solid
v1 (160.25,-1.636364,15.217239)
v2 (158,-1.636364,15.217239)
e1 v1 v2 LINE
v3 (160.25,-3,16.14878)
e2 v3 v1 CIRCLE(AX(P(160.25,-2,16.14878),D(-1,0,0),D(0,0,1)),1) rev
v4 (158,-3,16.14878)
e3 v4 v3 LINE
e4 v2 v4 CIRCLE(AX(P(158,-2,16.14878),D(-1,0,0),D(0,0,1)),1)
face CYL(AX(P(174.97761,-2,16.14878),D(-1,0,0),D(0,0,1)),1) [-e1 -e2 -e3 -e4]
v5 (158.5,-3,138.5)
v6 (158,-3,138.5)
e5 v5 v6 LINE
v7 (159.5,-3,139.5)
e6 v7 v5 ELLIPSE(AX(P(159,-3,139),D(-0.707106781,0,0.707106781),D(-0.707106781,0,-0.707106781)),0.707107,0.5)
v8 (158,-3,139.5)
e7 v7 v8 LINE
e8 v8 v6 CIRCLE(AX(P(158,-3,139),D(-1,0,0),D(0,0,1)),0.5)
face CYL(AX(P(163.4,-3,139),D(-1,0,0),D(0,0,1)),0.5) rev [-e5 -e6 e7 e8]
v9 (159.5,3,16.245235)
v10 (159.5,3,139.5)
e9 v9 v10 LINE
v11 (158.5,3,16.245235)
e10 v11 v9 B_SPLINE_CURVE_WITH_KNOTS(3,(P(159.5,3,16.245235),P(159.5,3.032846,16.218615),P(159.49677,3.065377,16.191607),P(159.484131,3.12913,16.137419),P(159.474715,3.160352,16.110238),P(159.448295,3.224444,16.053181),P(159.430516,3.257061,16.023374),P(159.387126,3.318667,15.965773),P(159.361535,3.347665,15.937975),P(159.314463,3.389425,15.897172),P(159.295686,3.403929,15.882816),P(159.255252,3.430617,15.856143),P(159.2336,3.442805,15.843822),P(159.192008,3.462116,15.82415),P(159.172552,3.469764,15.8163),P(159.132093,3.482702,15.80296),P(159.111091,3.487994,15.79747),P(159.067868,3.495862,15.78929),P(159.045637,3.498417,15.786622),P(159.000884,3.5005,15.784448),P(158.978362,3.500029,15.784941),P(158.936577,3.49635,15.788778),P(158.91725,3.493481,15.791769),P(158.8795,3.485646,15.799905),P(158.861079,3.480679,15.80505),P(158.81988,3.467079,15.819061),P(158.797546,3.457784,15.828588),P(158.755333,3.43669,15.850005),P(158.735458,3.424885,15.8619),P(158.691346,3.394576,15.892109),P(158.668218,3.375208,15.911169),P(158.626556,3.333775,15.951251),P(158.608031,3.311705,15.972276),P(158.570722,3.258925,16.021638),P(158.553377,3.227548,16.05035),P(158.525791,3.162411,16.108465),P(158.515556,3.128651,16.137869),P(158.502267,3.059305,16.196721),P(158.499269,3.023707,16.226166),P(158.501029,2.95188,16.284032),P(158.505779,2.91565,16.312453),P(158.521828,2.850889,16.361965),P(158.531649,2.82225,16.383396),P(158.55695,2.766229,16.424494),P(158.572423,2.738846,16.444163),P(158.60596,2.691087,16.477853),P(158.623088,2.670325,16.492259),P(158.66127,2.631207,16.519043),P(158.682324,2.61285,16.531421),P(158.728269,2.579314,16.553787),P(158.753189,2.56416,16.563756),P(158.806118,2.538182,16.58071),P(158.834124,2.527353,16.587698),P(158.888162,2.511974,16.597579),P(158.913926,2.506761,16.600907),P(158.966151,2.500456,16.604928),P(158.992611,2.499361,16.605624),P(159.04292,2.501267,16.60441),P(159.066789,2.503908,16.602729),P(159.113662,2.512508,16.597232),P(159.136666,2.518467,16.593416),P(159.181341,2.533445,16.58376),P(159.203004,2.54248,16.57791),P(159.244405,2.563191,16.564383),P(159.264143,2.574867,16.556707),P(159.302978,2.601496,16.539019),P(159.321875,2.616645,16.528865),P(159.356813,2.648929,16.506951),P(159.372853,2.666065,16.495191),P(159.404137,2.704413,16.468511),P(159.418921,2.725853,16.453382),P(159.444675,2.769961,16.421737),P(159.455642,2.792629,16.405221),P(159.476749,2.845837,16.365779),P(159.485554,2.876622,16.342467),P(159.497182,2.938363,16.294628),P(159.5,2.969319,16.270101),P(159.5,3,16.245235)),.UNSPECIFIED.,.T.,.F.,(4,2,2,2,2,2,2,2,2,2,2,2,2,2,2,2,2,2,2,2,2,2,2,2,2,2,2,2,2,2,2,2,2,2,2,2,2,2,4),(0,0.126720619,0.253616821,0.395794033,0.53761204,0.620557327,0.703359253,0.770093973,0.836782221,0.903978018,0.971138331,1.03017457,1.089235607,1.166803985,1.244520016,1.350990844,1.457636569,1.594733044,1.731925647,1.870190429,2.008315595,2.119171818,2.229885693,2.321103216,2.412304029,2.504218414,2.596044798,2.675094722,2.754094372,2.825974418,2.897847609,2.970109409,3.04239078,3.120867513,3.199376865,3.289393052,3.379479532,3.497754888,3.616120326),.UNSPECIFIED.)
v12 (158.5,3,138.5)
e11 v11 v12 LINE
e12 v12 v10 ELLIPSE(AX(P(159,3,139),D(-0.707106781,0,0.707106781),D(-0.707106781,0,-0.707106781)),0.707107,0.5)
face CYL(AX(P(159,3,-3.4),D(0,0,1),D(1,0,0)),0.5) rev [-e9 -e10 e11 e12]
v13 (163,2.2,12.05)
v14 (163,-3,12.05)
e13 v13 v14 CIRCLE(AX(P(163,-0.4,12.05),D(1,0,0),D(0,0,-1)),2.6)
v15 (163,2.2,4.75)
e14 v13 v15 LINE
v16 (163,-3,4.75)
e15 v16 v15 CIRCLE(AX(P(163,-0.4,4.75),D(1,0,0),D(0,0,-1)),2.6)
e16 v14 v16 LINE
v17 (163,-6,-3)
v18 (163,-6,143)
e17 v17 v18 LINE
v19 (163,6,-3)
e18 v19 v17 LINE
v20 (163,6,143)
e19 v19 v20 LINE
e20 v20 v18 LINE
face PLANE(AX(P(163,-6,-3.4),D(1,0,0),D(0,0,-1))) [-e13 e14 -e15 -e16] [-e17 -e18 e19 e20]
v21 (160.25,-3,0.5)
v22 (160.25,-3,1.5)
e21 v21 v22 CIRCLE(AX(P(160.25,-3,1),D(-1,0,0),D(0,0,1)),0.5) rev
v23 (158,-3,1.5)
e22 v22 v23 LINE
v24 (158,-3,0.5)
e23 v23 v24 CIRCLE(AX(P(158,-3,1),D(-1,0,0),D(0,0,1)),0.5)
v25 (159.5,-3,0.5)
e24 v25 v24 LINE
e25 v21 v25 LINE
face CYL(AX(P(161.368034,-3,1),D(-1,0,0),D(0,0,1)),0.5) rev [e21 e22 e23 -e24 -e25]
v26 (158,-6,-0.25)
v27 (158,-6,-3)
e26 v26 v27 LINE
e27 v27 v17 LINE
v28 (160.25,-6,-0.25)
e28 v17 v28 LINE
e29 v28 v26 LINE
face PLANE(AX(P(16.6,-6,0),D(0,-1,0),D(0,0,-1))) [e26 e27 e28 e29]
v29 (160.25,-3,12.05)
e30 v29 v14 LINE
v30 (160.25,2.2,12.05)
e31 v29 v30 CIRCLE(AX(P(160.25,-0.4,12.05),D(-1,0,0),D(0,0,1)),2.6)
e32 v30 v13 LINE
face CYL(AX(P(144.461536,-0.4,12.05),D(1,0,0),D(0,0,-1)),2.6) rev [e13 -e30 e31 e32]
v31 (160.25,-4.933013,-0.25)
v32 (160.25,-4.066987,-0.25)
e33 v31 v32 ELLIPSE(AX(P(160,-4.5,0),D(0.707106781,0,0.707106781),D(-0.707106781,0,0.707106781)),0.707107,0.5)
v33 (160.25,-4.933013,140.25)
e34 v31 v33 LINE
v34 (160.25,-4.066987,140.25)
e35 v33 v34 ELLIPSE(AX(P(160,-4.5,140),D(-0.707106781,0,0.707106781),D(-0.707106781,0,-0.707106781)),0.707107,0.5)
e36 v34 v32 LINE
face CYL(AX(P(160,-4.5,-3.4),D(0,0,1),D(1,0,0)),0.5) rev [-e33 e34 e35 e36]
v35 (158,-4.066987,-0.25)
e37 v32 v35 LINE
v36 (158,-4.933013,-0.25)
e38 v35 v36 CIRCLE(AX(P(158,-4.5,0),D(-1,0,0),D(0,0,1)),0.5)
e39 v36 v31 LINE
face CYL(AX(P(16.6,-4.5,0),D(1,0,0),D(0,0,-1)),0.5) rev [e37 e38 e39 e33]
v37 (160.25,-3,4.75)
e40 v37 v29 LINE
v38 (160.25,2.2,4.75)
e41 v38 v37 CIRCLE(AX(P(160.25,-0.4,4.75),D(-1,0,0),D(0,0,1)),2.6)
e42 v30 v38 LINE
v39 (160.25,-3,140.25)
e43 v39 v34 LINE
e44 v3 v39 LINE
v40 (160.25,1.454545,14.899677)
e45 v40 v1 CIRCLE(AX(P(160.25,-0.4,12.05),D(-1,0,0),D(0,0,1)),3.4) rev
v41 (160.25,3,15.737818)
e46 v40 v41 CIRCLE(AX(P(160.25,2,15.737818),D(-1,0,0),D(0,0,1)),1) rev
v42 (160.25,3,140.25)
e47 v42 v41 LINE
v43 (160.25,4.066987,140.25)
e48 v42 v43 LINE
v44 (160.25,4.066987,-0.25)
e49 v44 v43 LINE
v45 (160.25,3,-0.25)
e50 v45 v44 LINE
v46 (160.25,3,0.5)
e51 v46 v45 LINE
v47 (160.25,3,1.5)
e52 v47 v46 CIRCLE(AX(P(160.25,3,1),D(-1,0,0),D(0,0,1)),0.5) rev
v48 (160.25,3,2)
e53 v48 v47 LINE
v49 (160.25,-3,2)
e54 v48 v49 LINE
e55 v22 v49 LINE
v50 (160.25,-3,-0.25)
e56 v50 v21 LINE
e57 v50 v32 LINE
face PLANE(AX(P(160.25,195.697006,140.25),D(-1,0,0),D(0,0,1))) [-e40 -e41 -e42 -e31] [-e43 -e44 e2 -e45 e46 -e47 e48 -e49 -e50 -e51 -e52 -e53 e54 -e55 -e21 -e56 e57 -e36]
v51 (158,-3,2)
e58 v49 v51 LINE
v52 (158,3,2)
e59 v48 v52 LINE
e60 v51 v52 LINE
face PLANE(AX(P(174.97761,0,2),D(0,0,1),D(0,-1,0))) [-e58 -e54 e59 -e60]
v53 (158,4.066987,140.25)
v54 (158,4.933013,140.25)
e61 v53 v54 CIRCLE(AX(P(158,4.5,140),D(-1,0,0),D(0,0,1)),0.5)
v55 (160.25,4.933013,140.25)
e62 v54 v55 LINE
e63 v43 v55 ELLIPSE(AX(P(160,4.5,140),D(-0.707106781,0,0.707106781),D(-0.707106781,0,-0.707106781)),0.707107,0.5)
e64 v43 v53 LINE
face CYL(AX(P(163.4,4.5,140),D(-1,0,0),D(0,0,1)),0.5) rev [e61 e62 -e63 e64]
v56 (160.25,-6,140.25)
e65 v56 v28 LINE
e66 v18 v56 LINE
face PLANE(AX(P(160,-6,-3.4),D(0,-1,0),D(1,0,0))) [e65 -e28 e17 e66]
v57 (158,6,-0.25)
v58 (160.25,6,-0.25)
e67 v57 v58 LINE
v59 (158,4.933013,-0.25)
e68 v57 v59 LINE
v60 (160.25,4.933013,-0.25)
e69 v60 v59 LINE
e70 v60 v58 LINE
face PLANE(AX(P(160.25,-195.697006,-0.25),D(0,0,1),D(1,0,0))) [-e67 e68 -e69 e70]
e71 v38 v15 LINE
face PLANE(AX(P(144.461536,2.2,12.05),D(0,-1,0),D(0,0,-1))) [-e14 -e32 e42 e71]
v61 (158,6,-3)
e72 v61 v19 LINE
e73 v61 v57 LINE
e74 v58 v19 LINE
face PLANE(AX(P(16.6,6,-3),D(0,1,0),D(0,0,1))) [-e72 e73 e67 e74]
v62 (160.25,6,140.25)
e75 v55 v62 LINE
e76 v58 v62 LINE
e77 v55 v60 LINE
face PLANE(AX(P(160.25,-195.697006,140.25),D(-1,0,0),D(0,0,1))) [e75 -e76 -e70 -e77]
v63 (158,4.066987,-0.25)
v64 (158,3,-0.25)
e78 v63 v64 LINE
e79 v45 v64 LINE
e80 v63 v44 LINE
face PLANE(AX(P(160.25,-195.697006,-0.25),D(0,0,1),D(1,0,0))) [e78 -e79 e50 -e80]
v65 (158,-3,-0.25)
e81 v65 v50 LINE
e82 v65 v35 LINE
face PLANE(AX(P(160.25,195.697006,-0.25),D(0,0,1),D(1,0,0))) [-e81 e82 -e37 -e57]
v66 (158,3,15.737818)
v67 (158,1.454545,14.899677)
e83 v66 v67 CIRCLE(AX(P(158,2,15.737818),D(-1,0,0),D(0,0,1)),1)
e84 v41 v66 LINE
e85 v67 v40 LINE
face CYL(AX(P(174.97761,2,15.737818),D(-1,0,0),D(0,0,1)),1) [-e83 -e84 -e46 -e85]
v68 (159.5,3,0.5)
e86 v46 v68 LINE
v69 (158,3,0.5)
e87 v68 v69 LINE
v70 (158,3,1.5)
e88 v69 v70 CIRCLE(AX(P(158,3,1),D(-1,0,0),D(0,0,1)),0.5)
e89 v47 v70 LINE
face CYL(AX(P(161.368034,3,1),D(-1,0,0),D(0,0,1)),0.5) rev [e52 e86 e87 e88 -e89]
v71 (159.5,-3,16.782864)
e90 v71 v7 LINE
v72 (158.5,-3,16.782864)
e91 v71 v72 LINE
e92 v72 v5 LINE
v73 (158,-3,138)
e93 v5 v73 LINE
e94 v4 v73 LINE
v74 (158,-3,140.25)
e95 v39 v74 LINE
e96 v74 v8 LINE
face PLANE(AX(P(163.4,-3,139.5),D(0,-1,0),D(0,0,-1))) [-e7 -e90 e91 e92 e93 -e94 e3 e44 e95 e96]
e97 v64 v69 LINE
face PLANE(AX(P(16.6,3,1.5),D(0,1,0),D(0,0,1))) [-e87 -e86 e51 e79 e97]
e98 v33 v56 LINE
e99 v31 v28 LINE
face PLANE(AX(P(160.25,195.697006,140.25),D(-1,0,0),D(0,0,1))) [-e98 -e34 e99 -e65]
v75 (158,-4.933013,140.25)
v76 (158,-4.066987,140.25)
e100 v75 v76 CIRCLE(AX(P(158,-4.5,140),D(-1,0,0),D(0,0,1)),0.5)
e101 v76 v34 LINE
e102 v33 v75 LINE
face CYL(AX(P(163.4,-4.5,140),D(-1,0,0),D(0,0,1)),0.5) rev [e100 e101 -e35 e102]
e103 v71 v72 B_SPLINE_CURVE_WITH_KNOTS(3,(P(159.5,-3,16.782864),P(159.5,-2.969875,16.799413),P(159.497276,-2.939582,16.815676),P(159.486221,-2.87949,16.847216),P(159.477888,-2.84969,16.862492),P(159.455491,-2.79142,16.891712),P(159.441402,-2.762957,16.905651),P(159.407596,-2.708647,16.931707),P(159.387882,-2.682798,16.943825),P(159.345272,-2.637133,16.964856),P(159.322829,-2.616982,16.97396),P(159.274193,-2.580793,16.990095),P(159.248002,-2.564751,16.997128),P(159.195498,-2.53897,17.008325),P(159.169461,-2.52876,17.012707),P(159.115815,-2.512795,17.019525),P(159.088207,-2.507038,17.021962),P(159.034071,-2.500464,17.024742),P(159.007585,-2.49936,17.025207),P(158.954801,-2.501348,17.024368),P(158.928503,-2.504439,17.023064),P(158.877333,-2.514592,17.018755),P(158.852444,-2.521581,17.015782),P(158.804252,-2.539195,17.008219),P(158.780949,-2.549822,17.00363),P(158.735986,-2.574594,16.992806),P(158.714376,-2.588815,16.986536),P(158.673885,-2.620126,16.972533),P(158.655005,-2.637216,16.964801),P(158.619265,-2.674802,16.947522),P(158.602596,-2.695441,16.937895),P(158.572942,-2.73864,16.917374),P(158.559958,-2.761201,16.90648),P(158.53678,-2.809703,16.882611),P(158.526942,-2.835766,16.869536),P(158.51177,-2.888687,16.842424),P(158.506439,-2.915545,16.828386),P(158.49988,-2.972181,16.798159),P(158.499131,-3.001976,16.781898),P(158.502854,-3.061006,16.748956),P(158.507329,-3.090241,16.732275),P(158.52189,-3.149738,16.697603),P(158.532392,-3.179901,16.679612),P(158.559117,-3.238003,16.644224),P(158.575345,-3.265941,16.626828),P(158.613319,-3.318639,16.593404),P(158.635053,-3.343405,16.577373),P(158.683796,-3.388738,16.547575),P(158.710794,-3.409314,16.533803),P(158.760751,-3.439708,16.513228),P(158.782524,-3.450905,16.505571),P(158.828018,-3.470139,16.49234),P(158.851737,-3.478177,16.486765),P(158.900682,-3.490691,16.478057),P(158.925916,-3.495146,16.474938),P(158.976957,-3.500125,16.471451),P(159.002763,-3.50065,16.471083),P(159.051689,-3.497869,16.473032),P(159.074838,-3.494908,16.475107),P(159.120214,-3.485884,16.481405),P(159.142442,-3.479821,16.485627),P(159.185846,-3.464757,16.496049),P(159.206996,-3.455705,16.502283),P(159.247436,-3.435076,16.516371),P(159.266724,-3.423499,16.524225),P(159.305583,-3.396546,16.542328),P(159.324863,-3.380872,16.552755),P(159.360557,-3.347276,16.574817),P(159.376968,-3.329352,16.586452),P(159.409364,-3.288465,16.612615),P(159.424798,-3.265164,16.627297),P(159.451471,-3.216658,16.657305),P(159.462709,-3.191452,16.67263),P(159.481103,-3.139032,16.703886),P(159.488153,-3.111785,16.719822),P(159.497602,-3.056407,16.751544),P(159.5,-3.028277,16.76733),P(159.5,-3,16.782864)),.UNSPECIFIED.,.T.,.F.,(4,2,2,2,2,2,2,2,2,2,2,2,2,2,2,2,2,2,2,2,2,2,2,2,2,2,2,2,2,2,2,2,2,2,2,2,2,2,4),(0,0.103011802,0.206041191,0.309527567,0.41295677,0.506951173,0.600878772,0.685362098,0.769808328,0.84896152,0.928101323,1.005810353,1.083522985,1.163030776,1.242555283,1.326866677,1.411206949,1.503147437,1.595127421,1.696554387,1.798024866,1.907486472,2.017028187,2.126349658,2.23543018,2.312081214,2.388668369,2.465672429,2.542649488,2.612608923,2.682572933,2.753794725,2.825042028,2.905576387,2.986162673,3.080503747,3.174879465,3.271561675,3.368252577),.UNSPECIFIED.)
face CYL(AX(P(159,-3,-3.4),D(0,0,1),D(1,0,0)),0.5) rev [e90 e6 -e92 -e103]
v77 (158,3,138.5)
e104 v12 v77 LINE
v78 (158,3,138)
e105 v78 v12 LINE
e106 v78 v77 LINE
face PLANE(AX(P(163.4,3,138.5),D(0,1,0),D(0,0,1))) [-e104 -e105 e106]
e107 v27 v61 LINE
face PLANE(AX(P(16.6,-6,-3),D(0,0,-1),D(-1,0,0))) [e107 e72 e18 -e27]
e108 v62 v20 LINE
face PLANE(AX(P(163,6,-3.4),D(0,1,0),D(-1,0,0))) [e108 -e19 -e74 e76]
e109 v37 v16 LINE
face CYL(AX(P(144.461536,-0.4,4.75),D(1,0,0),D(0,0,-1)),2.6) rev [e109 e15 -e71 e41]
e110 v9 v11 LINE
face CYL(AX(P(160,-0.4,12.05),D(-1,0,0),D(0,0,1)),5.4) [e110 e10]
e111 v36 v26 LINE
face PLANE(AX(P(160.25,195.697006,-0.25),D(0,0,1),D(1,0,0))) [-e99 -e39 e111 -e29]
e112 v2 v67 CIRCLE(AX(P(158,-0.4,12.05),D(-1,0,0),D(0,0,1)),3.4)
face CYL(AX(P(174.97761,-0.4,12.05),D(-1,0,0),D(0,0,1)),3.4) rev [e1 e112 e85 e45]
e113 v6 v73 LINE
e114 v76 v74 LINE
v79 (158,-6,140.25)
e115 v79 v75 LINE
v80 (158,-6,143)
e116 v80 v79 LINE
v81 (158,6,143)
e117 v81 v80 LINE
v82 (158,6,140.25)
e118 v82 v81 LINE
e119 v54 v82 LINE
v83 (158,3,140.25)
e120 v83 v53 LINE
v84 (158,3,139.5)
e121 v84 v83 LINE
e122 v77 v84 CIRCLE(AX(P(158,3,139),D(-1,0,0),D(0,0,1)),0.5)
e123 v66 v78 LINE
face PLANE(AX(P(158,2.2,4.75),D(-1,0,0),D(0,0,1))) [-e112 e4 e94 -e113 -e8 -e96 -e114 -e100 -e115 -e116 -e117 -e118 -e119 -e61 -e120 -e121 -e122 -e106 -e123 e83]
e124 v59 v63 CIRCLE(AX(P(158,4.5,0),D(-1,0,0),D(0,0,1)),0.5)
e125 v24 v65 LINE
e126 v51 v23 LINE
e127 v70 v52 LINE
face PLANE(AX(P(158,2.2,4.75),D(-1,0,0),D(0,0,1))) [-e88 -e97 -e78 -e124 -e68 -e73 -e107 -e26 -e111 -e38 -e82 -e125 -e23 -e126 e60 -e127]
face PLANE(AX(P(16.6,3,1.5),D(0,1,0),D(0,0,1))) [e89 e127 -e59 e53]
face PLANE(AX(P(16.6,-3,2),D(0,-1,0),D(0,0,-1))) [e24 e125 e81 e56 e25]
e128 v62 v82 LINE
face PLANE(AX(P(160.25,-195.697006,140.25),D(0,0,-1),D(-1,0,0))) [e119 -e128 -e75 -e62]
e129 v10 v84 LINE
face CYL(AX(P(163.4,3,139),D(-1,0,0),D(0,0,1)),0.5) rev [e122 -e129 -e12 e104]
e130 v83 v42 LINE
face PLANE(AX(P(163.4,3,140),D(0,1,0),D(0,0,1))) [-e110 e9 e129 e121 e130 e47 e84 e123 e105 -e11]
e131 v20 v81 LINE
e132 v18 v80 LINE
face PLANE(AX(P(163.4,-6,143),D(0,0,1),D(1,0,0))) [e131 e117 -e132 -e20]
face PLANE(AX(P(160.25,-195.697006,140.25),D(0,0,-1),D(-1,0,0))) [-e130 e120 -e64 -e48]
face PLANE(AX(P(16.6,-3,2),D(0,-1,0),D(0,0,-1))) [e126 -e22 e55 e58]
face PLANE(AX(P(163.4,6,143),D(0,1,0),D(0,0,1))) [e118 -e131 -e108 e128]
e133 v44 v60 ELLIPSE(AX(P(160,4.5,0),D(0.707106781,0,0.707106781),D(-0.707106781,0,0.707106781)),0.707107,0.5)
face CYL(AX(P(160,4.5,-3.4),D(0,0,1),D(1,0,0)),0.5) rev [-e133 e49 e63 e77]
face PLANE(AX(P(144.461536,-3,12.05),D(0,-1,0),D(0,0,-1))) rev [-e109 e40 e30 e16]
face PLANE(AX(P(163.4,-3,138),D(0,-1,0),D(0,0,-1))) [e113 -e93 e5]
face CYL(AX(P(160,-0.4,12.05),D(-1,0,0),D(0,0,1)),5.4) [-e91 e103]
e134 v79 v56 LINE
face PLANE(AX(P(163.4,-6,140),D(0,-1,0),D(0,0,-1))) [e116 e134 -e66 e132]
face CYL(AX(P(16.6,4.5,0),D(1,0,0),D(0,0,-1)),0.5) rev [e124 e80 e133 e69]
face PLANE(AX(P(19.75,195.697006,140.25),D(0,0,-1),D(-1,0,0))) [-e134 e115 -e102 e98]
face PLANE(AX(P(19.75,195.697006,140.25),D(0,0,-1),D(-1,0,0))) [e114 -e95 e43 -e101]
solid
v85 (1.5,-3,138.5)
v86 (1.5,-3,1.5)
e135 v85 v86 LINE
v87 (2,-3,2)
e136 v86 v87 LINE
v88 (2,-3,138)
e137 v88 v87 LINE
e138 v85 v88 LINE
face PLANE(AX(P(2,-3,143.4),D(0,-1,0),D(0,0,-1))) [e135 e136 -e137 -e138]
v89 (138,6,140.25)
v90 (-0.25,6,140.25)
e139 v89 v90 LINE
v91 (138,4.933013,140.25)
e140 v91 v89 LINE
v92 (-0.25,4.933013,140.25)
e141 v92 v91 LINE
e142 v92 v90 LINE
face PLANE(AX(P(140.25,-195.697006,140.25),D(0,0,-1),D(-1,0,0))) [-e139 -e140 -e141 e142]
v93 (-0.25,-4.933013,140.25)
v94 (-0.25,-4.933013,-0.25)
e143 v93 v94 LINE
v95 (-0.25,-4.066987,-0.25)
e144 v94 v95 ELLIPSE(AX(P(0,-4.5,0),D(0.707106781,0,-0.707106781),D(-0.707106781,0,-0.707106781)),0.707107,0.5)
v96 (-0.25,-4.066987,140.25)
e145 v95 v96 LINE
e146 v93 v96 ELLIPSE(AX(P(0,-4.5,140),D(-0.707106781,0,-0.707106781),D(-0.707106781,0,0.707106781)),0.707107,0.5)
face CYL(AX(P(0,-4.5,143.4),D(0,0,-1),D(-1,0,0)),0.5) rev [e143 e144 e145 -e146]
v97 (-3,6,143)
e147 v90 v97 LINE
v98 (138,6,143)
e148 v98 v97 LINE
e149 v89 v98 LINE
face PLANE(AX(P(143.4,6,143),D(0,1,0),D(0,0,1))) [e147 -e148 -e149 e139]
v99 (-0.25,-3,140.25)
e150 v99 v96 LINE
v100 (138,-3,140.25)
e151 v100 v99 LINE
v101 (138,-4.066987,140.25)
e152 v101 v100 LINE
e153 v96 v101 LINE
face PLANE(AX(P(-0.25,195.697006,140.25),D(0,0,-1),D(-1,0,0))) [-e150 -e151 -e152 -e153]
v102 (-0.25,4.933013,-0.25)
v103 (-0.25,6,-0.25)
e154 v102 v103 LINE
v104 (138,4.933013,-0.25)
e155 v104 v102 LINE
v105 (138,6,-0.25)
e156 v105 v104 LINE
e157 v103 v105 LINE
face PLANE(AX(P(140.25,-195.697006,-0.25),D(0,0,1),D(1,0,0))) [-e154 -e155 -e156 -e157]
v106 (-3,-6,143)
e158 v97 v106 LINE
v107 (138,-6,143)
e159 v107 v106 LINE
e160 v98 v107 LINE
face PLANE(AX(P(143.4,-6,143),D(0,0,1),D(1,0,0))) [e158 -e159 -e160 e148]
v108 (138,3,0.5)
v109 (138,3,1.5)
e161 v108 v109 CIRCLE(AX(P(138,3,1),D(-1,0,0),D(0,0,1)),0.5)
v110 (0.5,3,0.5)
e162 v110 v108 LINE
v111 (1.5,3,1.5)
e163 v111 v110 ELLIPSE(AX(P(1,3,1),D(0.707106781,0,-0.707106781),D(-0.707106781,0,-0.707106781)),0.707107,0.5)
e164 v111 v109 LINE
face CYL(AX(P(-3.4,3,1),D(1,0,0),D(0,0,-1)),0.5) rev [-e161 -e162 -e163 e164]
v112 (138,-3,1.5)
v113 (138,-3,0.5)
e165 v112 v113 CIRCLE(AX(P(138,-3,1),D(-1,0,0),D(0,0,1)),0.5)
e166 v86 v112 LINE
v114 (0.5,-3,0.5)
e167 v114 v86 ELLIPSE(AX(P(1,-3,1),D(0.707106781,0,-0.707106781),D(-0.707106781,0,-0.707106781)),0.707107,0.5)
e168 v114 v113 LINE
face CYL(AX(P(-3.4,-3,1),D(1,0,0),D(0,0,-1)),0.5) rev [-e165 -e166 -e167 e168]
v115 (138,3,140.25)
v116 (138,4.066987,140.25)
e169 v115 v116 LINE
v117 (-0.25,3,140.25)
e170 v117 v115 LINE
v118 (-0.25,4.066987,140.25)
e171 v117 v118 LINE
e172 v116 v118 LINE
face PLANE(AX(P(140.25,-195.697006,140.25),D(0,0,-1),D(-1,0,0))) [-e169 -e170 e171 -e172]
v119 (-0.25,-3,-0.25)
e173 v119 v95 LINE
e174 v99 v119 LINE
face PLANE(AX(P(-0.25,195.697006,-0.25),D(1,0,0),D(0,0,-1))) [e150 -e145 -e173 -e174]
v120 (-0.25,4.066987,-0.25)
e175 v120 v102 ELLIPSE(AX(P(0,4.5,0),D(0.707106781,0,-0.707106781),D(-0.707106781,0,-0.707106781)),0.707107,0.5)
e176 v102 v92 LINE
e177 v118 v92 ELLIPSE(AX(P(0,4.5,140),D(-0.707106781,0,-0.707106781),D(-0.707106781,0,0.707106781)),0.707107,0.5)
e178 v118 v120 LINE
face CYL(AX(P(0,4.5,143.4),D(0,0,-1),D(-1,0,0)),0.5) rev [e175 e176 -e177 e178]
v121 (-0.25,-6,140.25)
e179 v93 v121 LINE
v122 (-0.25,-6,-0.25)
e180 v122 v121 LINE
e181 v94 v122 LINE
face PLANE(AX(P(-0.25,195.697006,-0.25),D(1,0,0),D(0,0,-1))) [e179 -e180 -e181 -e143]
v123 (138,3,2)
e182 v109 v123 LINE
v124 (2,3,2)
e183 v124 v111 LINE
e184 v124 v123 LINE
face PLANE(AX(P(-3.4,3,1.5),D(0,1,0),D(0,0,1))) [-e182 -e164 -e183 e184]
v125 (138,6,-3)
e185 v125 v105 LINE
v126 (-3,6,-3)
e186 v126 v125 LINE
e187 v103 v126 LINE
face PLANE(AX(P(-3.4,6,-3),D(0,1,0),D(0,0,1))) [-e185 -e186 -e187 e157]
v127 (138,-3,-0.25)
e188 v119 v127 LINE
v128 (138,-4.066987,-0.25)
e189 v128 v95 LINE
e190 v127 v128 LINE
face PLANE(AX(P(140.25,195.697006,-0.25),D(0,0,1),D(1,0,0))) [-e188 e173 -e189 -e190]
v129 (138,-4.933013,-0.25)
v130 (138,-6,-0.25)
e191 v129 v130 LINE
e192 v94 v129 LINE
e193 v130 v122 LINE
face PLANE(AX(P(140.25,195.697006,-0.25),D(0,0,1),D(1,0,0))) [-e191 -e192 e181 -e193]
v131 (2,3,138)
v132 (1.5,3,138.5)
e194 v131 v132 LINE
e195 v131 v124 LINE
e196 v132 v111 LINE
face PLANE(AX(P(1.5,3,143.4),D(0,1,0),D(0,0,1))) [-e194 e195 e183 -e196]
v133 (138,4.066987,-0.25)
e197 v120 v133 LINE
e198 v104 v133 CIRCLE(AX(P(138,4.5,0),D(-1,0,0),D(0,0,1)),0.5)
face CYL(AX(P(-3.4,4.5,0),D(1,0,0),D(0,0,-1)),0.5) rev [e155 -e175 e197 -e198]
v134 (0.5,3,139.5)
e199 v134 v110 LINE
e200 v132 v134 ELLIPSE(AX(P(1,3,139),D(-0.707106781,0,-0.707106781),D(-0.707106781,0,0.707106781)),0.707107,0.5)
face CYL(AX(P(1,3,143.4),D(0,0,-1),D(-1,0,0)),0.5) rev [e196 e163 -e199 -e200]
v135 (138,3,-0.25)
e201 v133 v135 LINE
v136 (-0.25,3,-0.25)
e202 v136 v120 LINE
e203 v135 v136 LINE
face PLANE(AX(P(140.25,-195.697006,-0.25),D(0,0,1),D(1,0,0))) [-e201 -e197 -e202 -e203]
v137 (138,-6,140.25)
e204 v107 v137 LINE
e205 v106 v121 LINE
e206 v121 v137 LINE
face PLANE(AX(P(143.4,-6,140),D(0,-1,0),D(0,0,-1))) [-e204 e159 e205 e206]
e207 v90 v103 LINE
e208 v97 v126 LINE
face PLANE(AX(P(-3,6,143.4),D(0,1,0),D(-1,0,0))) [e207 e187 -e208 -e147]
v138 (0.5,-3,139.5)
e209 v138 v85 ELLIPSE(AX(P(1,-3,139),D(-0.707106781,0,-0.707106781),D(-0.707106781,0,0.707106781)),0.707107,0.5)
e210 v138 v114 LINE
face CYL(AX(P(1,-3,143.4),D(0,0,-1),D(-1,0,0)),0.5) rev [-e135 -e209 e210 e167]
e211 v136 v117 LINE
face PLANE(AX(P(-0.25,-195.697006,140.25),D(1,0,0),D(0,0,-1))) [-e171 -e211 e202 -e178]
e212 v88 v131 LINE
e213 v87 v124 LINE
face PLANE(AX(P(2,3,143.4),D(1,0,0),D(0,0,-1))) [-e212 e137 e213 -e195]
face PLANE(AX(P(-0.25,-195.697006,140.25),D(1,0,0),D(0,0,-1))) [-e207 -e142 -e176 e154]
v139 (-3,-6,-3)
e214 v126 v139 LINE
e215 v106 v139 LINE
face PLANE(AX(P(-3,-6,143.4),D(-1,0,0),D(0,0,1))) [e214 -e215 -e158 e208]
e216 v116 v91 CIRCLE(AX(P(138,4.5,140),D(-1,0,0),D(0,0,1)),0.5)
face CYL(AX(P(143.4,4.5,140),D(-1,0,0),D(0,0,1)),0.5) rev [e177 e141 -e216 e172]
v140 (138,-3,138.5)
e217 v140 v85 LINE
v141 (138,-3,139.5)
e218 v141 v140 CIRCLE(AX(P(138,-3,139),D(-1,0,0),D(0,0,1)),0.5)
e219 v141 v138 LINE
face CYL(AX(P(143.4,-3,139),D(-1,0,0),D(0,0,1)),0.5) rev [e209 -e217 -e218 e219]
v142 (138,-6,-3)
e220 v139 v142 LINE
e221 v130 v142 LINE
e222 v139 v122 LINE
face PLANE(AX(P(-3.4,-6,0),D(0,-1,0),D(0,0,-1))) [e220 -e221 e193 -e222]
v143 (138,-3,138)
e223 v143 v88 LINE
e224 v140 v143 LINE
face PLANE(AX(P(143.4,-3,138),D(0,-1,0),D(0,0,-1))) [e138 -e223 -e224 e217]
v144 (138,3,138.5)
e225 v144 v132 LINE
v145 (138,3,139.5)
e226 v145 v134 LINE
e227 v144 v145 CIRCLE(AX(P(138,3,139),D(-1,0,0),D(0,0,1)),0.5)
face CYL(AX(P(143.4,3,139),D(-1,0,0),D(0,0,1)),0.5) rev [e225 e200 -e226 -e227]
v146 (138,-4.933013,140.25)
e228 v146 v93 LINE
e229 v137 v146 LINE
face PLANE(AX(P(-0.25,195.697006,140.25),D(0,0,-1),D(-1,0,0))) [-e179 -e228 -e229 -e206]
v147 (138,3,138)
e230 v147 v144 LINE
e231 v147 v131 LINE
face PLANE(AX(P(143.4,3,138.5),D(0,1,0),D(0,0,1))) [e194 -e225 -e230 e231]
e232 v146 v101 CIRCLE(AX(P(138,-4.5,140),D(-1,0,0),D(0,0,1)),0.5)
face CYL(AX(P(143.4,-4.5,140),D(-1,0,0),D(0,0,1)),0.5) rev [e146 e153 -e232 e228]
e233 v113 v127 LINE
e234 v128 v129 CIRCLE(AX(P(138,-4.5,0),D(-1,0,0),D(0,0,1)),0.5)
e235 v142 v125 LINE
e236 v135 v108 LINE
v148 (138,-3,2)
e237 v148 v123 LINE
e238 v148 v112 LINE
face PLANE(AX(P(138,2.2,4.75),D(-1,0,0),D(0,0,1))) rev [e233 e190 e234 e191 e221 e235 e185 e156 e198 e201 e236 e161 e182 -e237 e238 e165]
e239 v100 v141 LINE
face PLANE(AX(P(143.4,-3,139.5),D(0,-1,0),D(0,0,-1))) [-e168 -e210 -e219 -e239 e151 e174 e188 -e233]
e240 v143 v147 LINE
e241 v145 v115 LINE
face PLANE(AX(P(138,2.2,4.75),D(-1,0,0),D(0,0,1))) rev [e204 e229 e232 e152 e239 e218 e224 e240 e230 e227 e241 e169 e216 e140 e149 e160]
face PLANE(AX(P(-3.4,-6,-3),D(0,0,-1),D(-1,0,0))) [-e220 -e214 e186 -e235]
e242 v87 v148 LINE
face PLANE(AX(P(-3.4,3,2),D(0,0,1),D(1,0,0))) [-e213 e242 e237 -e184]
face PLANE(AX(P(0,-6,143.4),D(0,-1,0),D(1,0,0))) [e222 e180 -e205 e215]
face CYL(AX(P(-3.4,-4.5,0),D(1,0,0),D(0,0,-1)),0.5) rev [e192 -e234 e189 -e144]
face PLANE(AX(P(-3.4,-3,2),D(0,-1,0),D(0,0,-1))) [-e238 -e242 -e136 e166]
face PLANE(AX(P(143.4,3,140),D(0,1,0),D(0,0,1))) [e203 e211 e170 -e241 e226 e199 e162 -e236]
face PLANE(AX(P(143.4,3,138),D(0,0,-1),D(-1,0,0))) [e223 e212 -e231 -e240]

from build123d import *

# Parameters (mm, degrees)
CUT_EXTRUDE_2_REACH = 204.588
SKETCH_7_W          = 140.5
SKETCH_7_H          = 140.5
SKETCH_7_W_2        = 140
SKETCH_7_H_2        = 140
SKETCH_8_W          = 140.5
SKETCH_8_H          = 140.5
CUT_EXTRUDE_3_DEPTH = 3
CUT_EXTRUDE_4_REACH = 206.453
CUT_EXTRUDE_6_REACH = 217.421
EXTRUDE_1_DEPTH     = 2
FILLET_START        = 157
FILLET_1_DEPTH      = 3.25
FILLET_2_R          = 1
SKETCH_13_W         = 2.25
SKETCH_13_H         = 6
EXTRUDE_2_DEPTH     = 2.25
CUT_EXTRUDE_7_DEPTH = 2.25


with BuildPart() as part:
    # 掃出3: sweep along a path in 草圖1
    with BuildLine(Plane(origin=(0, 0, 0), x_dir=(1, 0, 0), z_dir=(0, 1, 0))) as sweep_3_path:
        Line((0, 0), (140, 0))
        Line((140, 0), (140, -140))
        Line((140, -140), (0, -140))
        Line((0, -140), (0, 0))
    # 草圖4 → 掃出3 (sweep)
    with BuildSketch(Plane(origin=(140, 0, 0), x_dir=(0, 0, -1), z_dir=(1, 0, 0))):
        with BuildLine():
            Line((-143, 6), (-140, 6))
            Line((-140, 6), (-140, 5))
            ThreePointArc((-140, 5), (-140.5, 4.5), (-140, 4))
            Line((-140, 4), (-140, 3))
            Line((-140, 3), (-139.5, 3))
            ThreePointArc((-139.5, 3), (-139, 2.5), (-138.5, 3))
            Line((-138.5, 3), (-138, 3))
            Line((-138, 3), (-138, -3))
            Line((-138, -3), (-138.5, -3))
            ThreePointArc((-138.5, -3), (-139, -2.5), (-139.5, -3))
            Line((-139.5, -3), (-140, -3))
            Line((-140, -3), (-140, -4))
            ThreePointArc((-140, -4), (-140.5, -4.5), (-140, -5))
            Line((-140, -5), (-140, -6))
            Line((-140, -6), (-143, -6))
            Line((-143, -6), (-143, 6))
        make_face()
    sweep(path=sweep_3_path.line, transition=Transition.RIGHT)

    # 除料-伸長2: up to this face of the body (flat: up to its plane)
    cut_extrude_2_end = Plane(part.part.faces().sort_by_distance((70, 3, 0.302010101))[0])
    # 草圖7 → 除料-伸長2 (cut, up to the picked face)
    with BuildSketch(Plane(origin=(0, 6, 0), x_dir=(-1, 0, 0), z_dir=(0, -1, 0)), mode=Mode.PRIVATE) as cut_extrude_2_sk1:
        with Locations((-70, -70)):
            Rectangle(SKETCH_7_W, SKETCH_7_H)
        with Locations((-70, -70)):
            Rectangle(SKETCH_7_W_2, SKETCH_7_H_2, mode=Mode.SUBTRACT)
    cut_extrude_2_tool1 = split(extrude(cut_extrude_2_sk1.sketch, amount=CUT_EXTRUDE_2_REACH, mode=Mode.PRIVATE), bisect_by=cut_extrude_2_end, keep=Keep.BOTH, mode=Mode.PRIVATE)
    add(cut_extrude_2_tool1.solids().sort_by(Axis((70, 6, 140.051303), (0, -1, 0)))[0], mode=Mode.SUBTRACT)

    # 草圖8 → 除料-伸長3 (cut)
    with BuildSketch(Plane(origin=(0, -6, 0), x_dir=(1, 0, 0), z_dir=(0, 1, 0))):
        with Locations((70, -70)):
            Rectangle(SKETCH_8_W, SKETCH_8_H)
    extrude(amount=CUT_EXTRUDE_3_DEPTH, mode=Mode.SUBTRACT)

    # 除料-伸長4: up to this face of the body (flat: up to its plane)
    cut_extrude_4_end = Plane(part.part.faces().sort_by_distance((138, 0, 70))[0])
    # 草圖9 → 除料-伸長4 (cut, up to the picked face)
    with BuildSketch(Plane(origin=(143, 0, 0), x_dir=(0, 0, -1), z_dir=(1, 0, 0)), mode=Mode.PRIVATE) as cut_extrude_4_sk1:
        with BuildLine():
            Line((-12.05, 2.2), (-4.75, 2.2))
            ThreePointArc((-4.75, 2.2), (-2.15, -0.4), (-4.75, -3))
            Line((-4.75, -3), (-12.05, -3))
            ThreePointArc((-12.05, -3), (-14.65, -0.4), (-12.05, 2.2))
        make_face()
    cut_extrude_4_tool1 = split(extrude(cut_extrude_4_sk1.sketch, amount=-CUT_EXTRUDE_4_REACH, mode=Mode.PRIVATE), bisect_by=cut_extrude_4_end, keep=Keep.BOTH, mode=Mode.PRIVATE)
    add(cut_extrude_4_tool1.solids().sort_by(Axis((143, -0.4, 8.4), (-1, 0, 0)))[0], mode=Mode.SUBTRACT)


with BuildPart() as body_2:
    # Split Bodies 2: read off the stored shape, not the designer's step
    # Split Bodies 2: the piece on the far side of the plane
    add(part.part)
    split(bisect_by=Plane.YZ.offset(138), keep=Keep.BOTTOM)


with BuildPart() as part_1:
    add(part.part)

    # Split Bodies 2
    split(bisect_by=Plane.YZ.offset(138), keep=Keep.TOP)


with BuildPart() as part_2:
    # Move Body 1: moved
    add(part_1.part.moved(Location((20, 0, 0))))

    # 除料-伸長6: up to this face of the body (flat: up to its plane)
    cut_extrude_6_end = Plane(part_2.part.faces().sort_by_distance((160.25, -3.533493649, 70))[0])
    # 草圖11 → 除料-伸長6 (cut, up to the picked face)
    with BuildSketch(Plane.ZY.offset(-158), mode=Mode.PRIVATE) as cut_extrude_6_sk1:
        with BuildLine():
            Line((12.050000019, 3), (2, 3))
            Line((2, 3), (2, -3))
            Line((2, -3), (4.75, -3))
            ThreePointArc((4.75, -3), (2.15, -0.4), (4.75, 2.2))
            Line((4.75, 2.2), (9.85910977, 2.2))
            ThreePointArc((9.85910977, 2.2), (10.88380963, 2.793743888), (12.050000019, 3))
        make_face()
    cut_extrude_6_tool1 = split(extrude(cut_extrude_6_sk1.sketch, amount=-CUT_EXTRUDE_6_REACH, mode=Mode.PRIVATE), bisect_by=cut_extrude_6_end, keep=Keep.BOTH, mode=Mode.PRIVATE)
    # 草圖11 → 除料-伸長6 (cut, up to the picked face)
    with BuildSketch(Plane.ZY.offset(-158), mode=Mode.PRIVATE) as cut_extrude_6_sk2:
        with BuildLine():
            ThreePointArc((15.45, -0.4), (14.454163063, 2.004163049), (12.050000019, 3))
            ThreePointArc((12.050000019, 3), (10.88380963, 2.793743888), (9.85910977, 2.2))
            Line((9.85910977, 2.2), (12.05, 2.2))
            ThreePointArc((12.05, 2.2), (14.65, -0.4), (12.05, -3))
            Line((12.05, -3), (14.24089023, -3))
            ThreePointArc((14.24089023, -3), (15.132939083, -1.833696833), (15.45, -0.4))
        make_face()
    cut_extrude_6_tool2 = split(extrude(cut_extrude_6_sk2.sketch, amount=-CUT_EXTRUDE_6_REACH, mode=Mode.PRIVATE), bisect_by=cut_extrude_6_end, keep=Keep.BOTH, mode=Mode.PRIVATE)
    # 草圖11 → 除料-伸長6 (cut, up to the picked face)
    with BuildSketch(Plane.ZY.offset(-158), mode=Mode.PRIVATE) as cut_extrude_6_sk3:
        with BuildLine():
            Line((12.05, 2.2), (9.85910977, 2.2))
            ThreePointArc((9.85910977, 2.2), (9.45, -2.59089023), (14.24089023, -3))
            Line((14.24089023, -3), (12.05, -3))
            ThreePointArc((12.05, -3), (14.65, -0.4), (12.05, 2.2))
        make_face()
    cut_extrude_6_tool3 = split(extrude(cut_extrude_6_sk3.sketch, amount=-CUT_EXTRUDE_6_REACH, mode=Mode.PRIVATE), bisect_by=cut_extrude_6_end, keep=Keep.BOTH, mode=Mode.PRIVATE)
    add(cut_extrude_6_tool1.solids().sort_by(Axis((158, 2.903691, 10.843662), (1, 0, 0)))[0], mode=Mode.SUBTRACT)
    add(cut_extrude_6_tool2.solids().sort_by(Axis((158, -1.799115, 15.058576), (1, 0, 0)))[0], mode=Mode.SUBTRACT)
    add(cut_extrude_6_tool3.solids().sort_by(Axis((158, -0.643627, 11.61632), (1, 0, 0)))[0], mode=Mode.SUBTRACT)

    # 草圖12 → 填料-伸長1 (add)
    with BuildSketch(Plane.ZY.offset(-158)):
        with BuildLine():
            ThreePointArc((17.45, -0.4), (17.13990526, 1.403569915), (16.245235393, 3))
            Line((16.245235393, 3), (12.05, 3))
            ThreePointArc((12.05, 3), (15.243743885, 0.766190379), (14.24089023, -3))
            Line((14.24089023, -3), (16.782863826, -3))
            ThreePointArc((16.782863826, -3), (17.280557555, -1.742113136), (17.45, -0.4))
        make_face()
    extrude(amount=-EXTRUDE_1_DEPTH)

    # 圓角1: read off the stored shape, not the designer's step
    # 圓角1 outline → 圓角1 (cut)
    with BuildSketch(Plane.YZ.offset(FILLET_START)):
        with BuildLine():
            Line((3, 12.05), (3, 15.737817783))
            ThreePointArc((3, 15.737817783), (2.476731295, 14.85876871), (1.454545455, 14.899677378))
            ThreePointArc((1.454545455, 14.899677378), (2.588766848, 13.670886402), (3, 12.05))
        make_face()
    extrude(amount=FILLET_1_DEPTH, mode=Mode.SUBTRACT)

    # 圓角2
    fillet_2_edges = [part_2.edges().sort_by_distance(p)[0] for p in [
        (159.125, -3, 14.24089023),
    ]]
    fillet(fillet_2_edges, radius=FILLET_2_R)

    # 草圖13 → 填料-伸長2 (add)
    with BuildSketch(Plane.XY.offset(2)):
        with Locations((159.125, 0)):
            Rectangle(SKETCH_13_W, SKETCH_13_H)
    extrude(amount=-EXTRUDE_2_DEPTH)

    # 草圖14 → 除料-伸長7 (cut)
    with BuildSketch(Plane.ZY.offset(-158)):
        with BuildLine():
            Line((0.5, 3), (1.5, 3))
            ThreePointArc((1.5, 3), (1, 3.5), (0.5, 3))
        make_face()
        with BuildLine():
            ThreePointArc((0.5, 3), (1, 2.5), (1.5, 3))
            Line((1.5, 3), (0.5, 3))
        make_face()
        with BuildLine():
            Line((0.5, -3), (1.5, -3))
            ThreePointArc((1.5, -3), (1, -2.5), (0.5, -3))
        make_face()
        with BuildLine():
            ThreePointArc((0.5, -3), (1, -3.5), (1.5, -3))
            Line((1.5, -3), (0.5, -3))
        make_face()
    extrude(amount=-CUT_EXTRUDE_7_DEPTH, mode=Mode.SUBTRACT)


solid = Compound([body_2.part, part_2.part])
